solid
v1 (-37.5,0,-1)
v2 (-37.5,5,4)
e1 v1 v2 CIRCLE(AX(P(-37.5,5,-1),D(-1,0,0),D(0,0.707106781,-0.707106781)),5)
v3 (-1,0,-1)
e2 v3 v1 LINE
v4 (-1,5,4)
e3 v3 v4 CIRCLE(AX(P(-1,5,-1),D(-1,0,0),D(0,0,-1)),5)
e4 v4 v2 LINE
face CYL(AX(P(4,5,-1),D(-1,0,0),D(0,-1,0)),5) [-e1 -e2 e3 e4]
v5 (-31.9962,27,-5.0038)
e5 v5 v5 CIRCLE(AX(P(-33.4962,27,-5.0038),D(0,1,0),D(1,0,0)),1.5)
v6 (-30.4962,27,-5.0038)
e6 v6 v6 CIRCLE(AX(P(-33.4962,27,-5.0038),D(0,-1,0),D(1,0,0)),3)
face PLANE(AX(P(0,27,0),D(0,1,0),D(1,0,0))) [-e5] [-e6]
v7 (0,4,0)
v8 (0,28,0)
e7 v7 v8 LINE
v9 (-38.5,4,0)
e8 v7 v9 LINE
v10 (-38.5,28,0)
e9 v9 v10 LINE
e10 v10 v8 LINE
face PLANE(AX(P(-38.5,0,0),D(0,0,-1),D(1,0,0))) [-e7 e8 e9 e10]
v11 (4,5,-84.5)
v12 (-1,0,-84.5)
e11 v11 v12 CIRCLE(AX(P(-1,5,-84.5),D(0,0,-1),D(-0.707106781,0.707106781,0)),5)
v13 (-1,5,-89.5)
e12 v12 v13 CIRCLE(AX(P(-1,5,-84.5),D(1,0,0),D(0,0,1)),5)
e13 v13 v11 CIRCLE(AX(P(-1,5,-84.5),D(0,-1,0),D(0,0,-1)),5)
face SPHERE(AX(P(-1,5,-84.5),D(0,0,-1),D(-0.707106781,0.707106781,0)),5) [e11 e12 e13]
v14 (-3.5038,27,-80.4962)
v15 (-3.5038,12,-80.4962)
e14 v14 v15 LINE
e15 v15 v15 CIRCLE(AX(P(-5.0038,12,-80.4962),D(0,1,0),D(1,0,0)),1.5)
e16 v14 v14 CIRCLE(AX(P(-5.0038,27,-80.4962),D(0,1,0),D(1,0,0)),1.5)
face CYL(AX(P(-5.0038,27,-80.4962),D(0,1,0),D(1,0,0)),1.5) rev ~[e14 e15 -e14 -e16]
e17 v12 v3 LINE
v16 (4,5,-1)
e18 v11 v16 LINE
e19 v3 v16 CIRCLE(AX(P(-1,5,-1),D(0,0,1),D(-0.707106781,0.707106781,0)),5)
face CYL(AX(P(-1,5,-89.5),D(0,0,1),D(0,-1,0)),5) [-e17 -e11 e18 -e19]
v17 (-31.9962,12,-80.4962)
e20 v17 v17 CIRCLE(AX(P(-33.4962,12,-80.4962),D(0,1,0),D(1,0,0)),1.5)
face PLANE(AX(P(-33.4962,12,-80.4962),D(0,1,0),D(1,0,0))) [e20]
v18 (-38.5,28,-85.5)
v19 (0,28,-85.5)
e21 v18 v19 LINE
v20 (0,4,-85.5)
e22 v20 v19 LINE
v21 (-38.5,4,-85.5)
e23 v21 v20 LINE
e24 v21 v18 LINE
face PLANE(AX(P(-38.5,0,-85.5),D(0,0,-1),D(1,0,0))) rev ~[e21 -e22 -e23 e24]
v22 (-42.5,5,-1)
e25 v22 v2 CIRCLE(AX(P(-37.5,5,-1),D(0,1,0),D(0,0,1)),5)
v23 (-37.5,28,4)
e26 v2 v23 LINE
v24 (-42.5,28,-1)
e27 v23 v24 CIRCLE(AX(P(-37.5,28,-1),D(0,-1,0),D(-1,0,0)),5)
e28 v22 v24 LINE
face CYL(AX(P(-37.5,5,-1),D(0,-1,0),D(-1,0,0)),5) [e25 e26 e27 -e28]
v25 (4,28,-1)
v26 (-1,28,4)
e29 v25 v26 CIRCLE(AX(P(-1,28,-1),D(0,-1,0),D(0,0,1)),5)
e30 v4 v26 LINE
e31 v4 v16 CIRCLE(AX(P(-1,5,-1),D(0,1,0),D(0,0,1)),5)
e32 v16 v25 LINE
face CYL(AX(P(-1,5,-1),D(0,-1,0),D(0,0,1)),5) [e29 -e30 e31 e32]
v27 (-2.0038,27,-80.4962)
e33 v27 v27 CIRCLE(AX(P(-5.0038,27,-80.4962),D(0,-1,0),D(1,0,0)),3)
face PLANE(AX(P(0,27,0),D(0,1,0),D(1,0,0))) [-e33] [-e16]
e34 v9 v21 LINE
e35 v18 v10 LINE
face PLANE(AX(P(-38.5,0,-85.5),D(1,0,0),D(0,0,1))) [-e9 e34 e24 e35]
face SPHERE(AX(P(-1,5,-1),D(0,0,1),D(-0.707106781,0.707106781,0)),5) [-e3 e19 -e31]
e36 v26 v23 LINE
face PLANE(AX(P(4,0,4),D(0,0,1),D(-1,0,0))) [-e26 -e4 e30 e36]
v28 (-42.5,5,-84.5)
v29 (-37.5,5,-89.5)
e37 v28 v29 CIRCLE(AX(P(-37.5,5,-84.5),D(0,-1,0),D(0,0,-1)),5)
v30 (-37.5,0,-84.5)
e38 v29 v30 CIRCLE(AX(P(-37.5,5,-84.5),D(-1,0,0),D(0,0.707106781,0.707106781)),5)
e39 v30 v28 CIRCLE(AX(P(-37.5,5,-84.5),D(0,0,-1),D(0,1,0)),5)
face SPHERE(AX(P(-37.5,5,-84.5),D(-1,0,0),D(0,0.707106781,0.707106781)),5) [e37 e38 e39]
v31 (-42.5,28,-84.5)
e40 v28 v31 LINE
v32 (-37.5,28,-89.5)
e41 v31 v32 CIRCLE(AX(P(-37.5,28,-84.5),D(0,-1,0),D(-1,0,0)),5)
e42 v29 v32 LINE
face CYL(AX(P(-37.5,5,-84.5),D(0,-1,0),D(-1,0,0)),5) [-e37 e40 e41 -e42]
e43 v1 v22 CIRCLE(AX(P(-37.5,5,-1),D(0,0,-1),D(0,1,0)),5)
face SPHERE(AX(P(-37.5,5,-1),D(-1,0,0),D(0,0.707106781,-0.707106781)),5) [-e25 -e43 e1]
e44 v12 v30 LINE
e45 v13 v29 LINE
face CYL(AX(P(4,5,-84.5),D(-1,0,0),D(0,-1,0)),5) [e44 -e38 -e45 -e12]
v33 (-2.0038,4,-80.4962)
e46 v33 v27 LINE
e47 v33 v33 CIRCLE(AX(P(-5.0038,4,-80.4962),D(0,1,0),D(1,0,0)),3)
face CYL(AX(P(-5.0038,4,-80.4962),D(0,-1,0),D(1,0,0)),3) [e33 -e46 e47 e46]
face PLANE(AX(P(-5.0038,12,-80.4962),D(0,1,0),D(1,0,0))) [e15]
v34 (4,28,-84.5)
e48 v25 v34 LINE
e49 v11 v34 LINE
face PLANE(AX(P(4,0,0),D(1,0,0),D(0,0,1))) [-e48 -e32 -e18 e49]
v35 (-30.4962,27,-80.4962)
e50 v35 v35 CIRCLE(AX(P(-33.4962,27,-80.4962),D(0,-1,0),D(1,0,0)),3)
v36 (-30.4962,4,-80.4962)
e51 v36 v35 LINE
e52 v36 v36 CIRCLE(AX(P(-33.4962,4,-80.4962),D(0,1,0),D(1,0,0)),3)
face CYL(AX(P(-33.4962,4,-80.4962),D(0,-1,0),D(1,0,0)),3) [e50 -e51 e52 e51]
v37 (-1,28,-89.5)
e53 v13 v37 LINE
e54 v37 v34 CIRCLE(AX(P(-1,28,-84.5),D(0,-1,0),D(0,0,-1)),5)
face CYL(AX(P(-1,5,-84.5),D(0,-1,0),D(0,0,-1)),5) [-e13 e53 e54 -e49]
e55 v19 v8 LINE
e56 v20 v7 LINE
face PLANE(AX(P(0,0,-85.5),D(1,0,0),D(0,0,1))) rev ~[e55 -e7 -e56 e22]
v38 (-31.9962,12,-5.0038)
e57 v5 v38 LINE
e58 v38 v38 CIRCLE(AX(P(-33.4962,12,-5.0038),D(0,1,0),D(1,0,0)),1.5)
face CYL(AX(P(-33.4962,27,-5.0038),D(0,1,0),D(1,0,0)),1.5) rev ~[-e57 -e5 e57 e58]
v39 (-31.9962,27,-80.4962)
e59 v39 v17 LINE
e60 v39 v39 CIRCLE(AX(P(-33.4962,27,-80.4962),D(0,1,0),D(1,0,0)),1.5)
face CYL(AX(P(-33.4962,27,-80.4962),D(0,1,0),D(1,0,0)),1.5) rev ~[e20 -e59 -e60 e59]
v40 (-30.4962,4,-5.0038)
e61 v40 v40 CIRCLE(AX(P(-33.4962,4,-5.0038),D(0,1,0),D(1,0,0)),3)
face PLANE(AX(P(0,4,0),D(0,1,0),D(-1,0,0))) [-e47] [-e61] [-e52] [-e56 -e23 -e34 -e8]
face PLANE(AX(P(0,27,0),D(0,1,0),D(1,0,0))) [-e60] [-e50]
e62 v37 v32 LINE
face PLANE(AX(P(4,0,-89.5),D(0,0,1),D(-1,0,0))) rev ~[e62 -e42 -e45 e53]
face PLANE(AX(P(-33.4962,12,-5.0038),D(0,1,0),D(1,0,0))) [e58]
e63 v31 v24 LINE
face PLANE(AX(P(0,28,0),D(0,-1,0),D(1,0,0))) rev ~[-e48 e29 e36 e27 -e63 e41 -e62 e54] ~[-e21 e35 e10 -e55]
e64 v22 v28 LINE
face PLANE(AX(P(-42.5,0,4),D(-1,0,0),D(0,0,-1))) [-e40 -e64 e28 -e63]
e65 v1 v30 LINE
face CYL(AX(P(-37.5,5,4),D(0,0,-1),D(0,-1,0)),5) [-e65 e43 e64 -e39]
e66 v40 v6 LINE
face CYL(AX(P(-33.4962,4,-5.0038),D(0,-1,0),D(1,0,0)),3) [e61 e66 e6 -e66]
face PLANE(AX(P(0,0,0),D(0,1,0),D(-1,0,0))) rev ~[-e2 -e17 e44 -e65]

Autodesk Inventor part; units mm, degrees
ref_plane "YZ Plane" through (0, 0, 0) normal (1, 0, 0) x (0, 1, 0)
ref_plane "XZ Plane" through (0, 0, 0) normal (0, 1, 0) x (-1, 0, 0)
ref_plane "XY Plane" through (0, 0, 0) normal (0, 0, 1) x (1, 0, 0)
sketch "Sketch2" plane through (0, 0, 0) normal (0, 1, 0) x (-1, 0, 0)
  line L0 (0, 0) -> (38.5, 0)
  line L1 (38.5, 0) -> (38.5, -85.5)
  line L2 (38.5, -85.5) -> (0, -85.5)
  line L3 (0, -85.5) -> (0, 0)
  dimension "d5" = 38.5
  dimension "d6" = 85.5
extrude "Extrusion2" add sketch "Sketch2" along normal blind 4
sketch "Sketch4" plane through (0, 0, 0) normal (0, -1, 0) x (1, 0, 0)
  line L0 (0, 0) -> (4, 0)
  line L1 (4, 0) -> (4, -85.5)
  line L2 (4, -85.5) -> (0, -85.5)
  line L3 (0, -85.5) -> (0, 0)
  line L4 (-38.5, 0) -> (0, 0) projected
  line L5 (-38.5, 0) -> (-42.5, 0)
  line L6 (-42.5, 0) -> (-42.5, -85.5)
  line L7 (-42.5, -85.5) -> (-38.5, -85.5)
  line L8 (-38.5, -85.5) -> (-38.5, 0)
  line L9 (-42.5, -85.5) -> (4, -85.5)
  line L10 (4, -85.5) -> (4, -89.5)
  line L11 (4, -89.5) -> (-42.5, -89.5)
  line L12 (-42.5, -89.5) -> (-42.5, -85.5)
  line L13 (-42.5, 0) -> (4, 0)
  line L14 (4, 0) -> (4, 4)
  line L15 (4, 4) -> (-42.5, 4)
  line L16 (-42.5, 4) -> (-42.5, 0)
  dimension "d13" = 4
  dimension "d14" = 4
  dimension "d15" = 4
  dimension "d16" = 4
extrude "Extrusion3" add sketch "Sketch4" against normal blind 28 contours L4 L5 L16 L15 L14 L0 | L0 L1 L2 L3 | L2 L10 L11 L12 L7 L9 | L8 L7 L6 L5
fillet "Fillet1" radius 5 4 edges at (-42.5, 0, -42.75) (-19.25, 0, -89.5) (4, 0, -42.75) (-19.25, 0, 4)
fillet "Fillet2" radius 5 2 edges at (-41.0355, 1.4645, 2.5355) (-42.5, 16.5, 4)
fillet "Fillet3" radius 5 6 edges at (2.5355, 1.4645, 2.5355) (4, 16.5, 4) (2.5355, 1.4645, -88.0355) (4, 16.5, -89.5) (-41.0355, 1.4645, -88.0355) (-42.5, 16.5, -89.5)
sketch "Sketch5" plane through (0, 4, 0) normal (0, 1, 0) x (1, 0, 0)
  line L0 (0, 85.5) -> (0, 0) projected
  line L1 (0, 0) -> (-5.0038, 0)
  line L2 (0, 5.0038) -> (0, 0)
  line L3 (0, 85.5) -> (-5.0038, 85.5)
  line L4 (-5.0038, 85.5) -> (-5.0038, 80.4962)
  line L5 (-5.0038, 80.4962) -> (0, 80.4962)
  line L6 (0, 80.4962) -> (0, 85.5)
  circle A0 centre (-5.0038, 80.4962) radius 3
  line L7 (0, 85.5) -> (-38.5, 85.5) projected
  line L8 (-38.5, 85.5) -> (-33.4962, 85.5)
  line L9 (-33.4962, 85.5) -> (-33.4962, 80.4962)
  line L10 (-33.4962, 80.4962) -> (-38.5, 80.4962)
  line L11 (-38.5, 80.4962) -> (-38.5, 85.5)
  circle A1 centre (-33.4962, 80.4962) radius 3
  line L12 (0, 0) -> (-38.5, 0) projected
  line L13 (-38.5, 0) -> (-33.4962, 0)
  line L14 (-33.4962, 0) -> (-33.4962, 5.0038)
  line L15 (-33.4962, 5.0038) -> (-38.5, 5.0038)
  line L16 (-38.5, 5.0038) -> (-38.5, 0)
  circle A2 centre (-33.4962, 5.0038) radius 3
  dimension "d25" = 5.0038
  dimension "d26" = 5.0038
  dimension "d27" = 6
  dimension "d28" = 5.0038
  dimension "d29" = 5.0038
  dimension "d30" = 6
  dimension "d31" = 5.0038
  dimension "d32" = 5.0038
  dimension "d33" = 6
extrude "Extrusion4" add sketch "Sketch5" along normal blind 23 contours A0 L4 L5 | L5 L4 A0 | A1 L10 L9 | L9 L10 A1 | A2 L15 L14 | L14 L15 A2
sketch "Sketch6" plane through (-33.4962, 27, -5.0038) normal (0, 1, 0) x (1, 0, 0)
  circle A0 centre (0, 0) radius 1.5
  point P0 (33.4962, -5.0038)
  dimension "d36" = 3
sketch "Sketch7" plane through (-33.4962, 27, -80.4962) normal (0, 1, 0) x (1, 0, 0)
  circle A0 centre (0, 0) radius 3 projected
  circle A1 centre (0, 0) radius 1.5
  point P0 (33.4962, -80.4962)
  dimension "d37" = 3
sketch "Sketch8" plane through (-5.0038, 27, -80.4962) normal (0, 1, 0) x (1, 0, 0)
  circle A0 centre (0, 0) radius 3 projected
  circle A1 centre (0, 0) radius 1.5
  point P0 (5.0038, -80.4962)
  dimension "d38" = 3
extrude "Extrusion5" cut sketch "Sketch6" against normal blind 15
extrude "Extrusion6" cut sketch "Sketch7" against normal blind 15 contours A1
extrude "Extrusion7" cut sketch "Sketch8" against normal blind 15 contours A1
properties part number "Bottomcase"
